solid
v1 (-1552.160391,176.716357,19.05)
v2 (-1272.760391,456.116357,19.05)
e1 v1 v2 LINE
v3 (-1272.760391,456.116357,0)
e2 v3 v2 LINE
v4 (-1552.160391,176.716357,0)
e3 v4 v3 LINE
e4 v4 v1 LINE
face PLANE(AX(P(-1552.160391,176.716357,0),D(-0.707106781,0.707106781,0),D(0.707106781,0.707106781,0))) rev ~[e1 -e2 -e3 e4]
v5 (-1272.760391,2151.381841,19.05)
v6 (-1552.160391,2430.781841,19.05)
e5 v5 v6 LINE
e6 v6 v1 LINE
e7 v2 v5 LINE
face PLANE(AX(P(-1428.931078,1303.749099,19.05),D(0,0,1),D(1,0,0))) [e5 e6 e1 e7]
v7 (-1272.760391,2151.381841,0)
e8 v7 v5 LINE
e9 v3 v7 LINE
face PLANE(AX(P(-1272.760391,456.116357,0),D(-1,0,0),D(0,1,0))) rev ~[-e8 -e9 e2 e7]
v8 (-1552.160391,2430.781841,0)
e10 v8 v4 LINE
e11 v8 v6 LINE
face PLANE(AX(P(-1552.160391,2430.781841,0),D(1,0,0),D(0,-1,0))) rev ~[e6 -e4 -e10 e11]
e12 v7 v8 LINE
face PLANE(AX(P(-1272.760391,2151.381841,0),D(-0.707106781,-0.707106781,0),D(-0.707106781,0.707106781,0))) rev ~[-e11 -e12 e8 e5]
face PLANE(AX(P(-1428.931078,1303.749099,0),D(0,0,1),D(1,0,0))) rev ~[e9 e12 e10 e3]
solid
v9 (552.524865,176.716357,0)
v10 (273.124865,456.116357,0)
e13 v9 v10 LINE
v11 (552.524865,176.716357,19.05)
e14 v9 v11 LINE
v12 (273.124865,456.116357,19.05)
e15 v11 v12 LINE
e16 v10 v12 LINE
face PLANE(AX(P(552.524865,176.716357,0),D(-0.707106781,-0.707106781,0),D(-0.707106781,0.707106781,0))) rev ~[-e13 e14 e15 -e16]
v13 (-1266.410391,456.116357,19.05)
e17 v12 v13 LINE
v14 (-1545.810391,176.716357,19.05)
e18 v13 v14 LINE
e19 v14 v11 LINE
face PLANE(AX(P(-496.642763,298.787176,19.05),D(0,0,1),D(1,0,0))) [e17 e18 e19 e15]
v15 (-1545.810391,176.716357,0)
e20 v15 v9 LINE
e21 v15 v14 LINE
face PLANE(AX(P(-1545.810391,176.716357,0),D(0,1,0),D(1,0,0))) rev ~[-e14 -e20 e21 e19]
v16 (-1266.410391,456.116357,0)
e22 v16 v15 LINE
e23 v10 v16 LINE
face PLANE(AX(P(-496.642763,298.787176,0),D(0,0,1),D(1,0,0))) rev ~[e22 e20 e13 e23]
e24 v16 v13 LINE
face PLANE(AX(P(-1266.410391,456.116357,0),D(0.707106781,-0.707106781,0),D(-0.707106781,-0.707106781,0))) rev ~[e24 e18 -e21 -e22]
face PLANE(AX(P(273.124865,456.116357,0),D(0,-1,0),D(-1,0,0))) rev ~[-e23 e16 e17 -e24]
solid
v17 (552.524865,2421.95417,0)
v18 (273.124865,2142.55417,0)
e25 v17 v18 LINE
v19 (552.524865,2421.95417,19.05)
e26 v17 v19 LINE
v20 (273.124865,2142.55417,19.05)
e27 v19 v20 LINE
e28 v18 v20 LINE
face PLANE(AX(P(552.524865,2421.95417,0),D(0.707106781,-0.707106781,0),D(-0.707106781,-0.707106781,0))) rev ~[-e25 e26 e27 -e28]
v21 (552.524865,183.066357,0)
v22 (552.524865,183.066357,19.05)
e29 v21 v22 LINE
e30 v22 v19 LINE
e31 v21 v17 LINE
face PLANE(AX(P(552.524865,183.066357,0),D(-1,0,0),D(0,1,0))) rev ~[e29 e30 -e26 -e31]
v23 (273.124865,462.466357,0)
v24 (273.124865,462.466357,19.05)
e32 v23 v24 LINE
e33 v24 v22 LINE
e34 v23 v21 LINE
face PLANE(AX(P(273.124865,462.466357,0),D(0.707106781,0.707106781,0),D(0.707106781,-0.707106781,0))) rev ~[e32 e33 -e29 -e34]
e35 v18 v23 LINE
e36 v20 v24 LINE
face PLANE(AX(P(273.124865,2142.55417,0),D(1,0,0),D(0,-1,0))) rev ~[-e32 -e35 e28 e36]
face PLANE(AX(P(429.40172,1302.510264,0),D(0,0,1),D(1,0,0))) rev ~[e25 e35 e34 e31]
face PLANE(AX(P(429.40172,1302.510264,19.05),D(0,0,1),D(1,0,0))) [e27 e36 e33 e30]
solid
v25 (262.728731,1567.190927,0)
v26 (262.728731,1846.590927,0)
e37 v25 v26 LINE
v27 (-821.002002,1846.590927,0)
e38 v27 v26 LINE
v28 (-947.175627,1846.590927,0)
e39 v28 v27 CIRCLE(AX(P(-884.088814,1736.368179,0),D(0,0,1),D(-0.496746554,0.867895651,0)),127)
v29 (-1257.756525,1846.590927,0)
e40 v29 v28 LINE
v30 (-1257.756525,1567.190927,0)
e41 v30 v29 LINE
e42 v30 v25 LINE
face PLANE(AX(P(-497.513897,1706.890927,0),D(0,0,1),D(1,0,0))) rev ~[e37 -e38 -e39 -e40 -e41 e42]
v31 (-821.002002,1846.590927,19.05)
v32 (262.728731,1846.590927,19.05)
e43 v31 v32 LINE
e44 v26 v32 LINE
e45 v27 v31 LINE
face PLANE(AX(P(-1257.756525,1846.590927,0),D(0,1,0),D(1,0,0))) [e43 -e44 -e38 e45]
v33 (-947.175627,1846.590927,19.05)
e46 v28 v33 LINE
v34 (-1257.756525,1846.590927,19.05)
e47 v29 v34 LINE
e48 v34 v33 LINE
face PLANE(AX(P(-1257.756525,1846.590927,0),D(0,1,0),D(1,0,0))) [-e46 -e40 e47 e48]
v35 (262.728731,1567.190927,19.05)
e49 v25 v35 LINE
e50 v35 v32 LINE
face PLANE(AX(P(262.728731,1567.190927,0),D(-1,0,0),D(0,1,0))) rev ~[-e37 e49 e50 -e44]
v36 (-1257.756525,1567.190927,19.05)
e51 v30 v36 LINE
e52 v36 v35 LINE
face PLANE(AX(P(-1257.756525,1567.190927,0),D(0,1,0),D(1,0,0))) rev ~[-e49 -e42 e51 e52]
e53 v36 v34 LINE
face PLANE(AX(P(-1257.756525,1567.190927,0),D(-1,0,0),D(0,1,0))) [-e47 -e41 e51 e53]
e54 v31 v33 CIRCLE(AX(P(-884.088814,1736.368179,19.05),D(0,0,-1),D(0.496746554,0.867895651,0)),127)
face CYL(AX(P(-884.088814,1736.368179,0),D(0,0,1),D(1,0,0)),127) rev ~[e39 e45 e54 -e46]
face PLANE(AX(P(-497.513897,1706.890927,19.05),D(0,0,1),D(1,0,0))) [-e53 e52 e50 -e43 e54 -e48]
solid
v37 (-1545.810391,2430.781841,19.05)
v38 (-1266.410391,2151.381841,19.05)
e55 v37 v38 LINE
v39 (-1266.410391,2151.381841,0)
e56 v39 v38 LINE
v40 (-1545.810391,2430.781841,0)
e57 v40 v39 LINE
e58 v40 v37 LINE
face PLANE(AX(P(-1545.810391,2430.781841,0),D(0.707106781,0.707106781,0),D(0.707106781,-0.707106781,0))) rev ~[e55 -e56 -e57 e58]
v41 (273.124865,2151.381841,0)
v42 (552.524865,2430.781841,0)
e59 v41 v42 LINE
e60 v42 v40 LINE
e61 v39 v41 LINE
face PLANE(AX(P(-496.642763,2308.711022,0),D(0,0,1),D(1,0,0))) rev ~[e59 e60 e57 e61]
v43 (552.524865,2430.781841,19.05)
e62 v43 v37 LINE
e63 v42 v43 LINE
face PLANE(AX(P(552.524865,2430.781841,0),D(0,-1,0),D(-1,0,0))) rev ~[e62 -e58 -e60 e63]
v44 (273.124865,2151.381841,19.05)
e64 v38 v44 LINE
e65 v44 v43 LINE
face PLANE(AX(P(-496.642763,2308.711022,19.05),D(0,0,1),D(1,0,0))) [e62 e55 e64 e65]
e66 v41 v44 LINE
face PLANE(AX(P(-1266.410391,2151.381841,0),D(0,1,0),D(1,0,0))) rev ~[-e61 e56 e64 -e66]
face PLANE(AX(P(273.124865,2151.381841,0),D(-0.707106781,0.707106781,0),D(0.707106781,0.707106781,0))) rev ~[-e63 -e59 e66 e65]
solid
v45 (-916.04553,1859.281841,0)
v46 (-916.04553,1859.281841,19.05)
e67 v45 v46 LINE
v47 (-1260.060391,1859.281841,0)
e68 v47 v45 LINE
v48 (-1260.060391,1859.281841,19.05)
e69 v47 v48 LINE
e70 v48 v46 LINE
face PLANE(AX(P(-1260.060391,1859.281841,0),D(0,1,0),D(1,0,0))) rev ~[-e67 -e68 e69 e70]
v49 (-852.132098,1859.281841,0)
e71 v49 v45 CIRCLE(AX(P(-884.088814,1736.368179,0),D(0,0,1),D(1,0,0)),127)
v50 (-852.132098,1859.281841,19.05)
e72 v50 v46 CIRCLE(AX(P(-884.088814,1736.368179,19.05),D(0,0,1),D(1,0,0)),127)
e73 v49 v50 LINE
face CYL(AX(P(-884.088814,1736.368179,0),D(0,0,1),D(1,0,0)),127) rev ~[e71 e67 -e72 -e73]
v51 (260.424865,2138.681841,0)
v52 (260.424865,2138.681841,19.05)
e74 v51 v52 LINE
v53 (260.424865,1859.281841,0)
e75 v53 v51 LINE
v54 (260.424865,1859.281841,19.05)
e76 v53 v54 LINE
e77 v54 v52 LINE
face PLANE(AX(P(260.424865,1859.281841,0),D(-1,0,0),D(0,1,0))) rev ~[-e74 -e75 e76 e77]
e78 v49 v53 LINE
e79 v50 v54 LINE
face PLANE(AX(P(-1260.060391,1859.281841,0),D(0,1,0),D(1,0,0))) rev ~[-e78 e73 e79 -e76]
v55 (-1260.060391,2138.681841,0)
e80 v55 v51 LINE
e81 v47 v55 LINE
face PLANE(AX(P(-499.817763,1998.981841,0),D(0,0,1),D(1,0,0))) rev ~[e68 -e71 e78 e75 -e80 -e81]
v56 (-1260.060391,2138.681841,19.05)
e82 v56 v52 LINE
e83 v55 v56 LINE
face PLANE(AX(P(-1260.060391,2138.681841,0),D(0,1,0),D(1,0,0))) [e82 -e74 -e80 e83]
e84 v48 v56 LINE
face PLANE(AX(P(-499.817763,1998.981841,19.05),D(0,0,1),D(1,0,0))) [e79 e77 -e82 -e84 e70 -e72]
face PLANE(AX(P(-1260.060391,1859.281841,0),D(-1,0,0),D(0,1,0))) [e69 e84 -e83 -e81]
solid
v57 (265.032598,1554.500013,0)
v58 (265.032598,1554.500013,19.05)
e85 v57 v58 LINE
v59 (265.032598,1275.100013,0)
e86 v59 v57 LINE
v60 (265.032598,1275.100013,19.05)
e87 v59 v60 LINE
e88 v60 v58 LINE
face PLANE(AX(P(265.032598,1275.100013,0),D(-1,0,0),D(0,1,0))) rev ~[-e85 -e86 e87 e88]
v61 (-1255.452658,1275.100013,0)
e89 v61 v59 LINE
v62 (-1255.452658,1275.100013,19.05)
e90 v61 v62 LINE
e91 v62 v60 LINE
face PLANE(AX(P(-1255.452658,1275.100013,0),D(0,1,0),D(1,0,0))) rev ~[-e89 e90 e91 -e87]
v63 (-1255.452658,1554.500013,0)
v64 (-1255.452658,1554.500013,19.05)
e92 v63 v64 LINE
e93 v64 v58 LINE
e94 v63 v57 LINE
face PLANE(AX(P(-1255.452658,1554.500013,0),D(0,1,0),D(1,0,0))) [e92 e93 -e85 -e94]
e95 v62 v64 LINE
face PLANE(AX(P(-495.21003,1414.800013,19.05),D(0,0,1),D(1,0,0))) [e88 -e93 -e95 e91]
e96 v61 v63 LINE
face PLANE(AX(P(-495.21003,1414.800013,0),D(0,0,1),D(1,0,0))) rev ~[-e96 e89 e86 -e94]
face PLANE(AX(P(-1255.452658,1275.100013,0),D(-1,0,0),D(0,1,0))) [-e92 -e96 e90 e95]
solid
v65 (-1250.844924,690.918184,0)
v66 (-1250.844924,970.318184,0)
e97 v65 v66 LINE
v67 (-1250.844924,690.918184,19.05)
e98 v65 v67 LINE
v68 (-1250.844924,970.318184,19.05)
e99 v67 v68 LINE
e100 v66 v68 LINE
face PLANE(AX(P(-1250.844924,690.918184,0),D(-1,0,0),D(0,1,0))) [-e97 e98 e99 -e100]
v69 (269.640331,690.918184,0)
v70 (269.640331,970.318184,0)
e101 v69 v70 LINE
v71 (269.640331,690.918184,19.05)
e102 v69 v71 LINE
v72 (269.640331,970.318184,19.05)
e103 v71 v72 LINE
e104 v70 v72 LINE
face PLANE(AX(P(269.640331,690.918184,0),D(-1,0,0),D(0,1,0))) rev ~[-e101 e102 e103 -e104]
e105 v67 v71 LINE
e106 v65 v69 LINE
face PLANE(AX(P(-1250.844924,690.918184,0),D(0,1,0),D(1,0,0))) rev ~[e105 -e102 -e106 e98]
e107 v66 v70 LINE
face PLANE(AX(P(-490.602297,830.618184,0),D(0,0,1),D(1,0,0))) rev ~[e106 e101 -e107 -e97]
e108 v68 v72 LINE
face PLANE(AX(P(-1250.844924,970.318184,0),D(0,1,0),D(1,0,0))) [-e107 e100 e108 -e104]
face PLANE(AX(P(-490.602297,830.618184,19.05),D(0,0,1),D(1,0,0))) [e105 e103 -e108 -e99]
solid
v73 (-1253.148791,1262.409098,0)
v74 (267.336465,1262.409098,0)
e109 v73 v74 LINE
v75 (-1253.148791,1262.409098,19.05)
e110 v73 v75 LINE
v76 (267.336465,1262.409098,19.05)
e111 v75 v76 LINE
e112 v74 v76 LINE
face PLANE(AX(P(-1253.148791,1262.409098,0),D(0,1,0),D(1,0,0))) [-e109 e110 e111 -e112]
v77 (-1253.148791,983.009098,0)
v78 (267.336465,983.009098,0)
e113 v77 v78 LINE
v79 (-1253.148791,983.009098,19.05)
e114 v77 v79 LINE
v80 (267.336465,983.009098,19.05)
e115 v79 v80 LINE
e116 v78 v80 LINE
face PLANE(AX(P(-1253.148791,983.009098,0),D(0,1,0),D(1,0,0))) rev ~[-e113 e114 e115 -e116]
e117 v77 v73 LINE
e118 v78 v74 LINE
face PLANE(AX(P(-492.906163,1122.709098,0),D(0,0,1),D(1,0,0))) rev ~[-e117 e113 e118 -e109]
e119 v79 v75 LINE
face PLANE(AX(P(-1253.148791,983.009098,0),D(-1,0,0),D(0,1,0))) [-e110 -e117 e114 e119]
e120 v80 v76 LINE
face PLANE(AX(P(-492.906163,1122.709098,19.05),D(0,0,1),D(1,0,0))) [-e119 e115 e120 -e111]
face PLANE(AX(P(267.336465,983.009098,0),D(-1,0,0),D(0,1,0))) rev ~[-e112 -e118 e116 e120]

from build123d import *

# Parameters (mm, degrees)
F1_DEPTH      = 19.05
F0_W          = 1520.485255909
F0_H          = 279.4
F2_R          = 127
F3_DEPTH      = 19.051
F3_DEPTH_BACK = 4532


# Not quite as in the source:
# - an extrude ends at something that could not be found from the text; its depth is read off the source's solid


with BuildPart() as f1:
    # F0 (on Top) → F1 (new body)
    with BuildSketch(Plane.XY):
        Polygon((-1552.1603912354, 2430.7818412781), (-1552.1603912354, 176.7163574696), (-1272.7603912354, 456.1163574696), (-1272.7603912354, 2151.3818412781), align=None)
    extrude(amount=F1_DEPTH)


with BuildPart() as f1b:
    # F0 (on Top) → F1, piece 2 (new body)
    with BuildSketch(Plane.XY):
        Polygon((-1545.8103912354, 176.7163574696), (552.5248646736, 176.7163574696), (273.1248646736, 456.1163574696), (-1266.4103912354, 456.1163574696), align=None)
    extrude(amount=F1_DEPTH)


with BuildPart() as f1c:
    # F0 (on Top) → F1, piece 3 (new body)
    with BuildSketch(Plane.XY):
        Polygon((552.5248646736, 2430.7818412781), (-1545.8103912354, 2430.7818412781), (-1266.4103912354, 2151.3818412781), (273.1248646736, 2151.3818412781), align=None)
    extrude(amount=F1_DEPTH)


with BuildPart() as f1d:
    # F0 (on Top) → F1, piece 4 (new body)
    with BuildSketch(Plane.XY):
        Polygon((552.5248646736, 183.0663574696), (552.5248646736, 2421.9541702463), (273.1248646736, 2142.5541702463), (273.1248646736, 462.4663574696), align=None)
    extrude(amount=F1_DEPTH)


with BuildPart() as f1e:
    # F0 (on Top) → F1, piece 5 (new body)
    with BuildSketch(Plane.XY):
        with Locations((-499.8177632809, 1998.9818412781)):
            Rectangle(F0_W, F0_H)
    extrude(amount=F1_DEPTH)


with BuildPart() as f1f:
    # F0 (on Top) → F1, piece 6 (new body)
    with BuildSketch(Plane.XY):
        with Locations((-497.513896589, 1706.8909270095)):
            Rectangle(F0_W, F0_H)
    extrude(amount=F1_DEPTH)


with BuildPart() as f1g:
    # F0 (on Top) → F1, piece 7 (new body)
    with BuildSketch(Plane.XY):
        with Locations((-495.2100298971, 1414.8000127409)):
            Rectangle(F0_W, F0_H)
    extrude(amount=F1_DEPTH)


with BuildPart() as f1h:
    # F0 (on Top) → F1, piece 8 (new body)
    with BuildSketch(Plane.XY):
        with Locations((-492.9061632052, 1122.7090984723)):
            Rectangle(F0_W, F0_H)
    extrude(amount=F1_DEPTH)


with BuildPart() as f1i:
    # F0 (on Top) → F1, piece 9 (new body)
    with BuildSketch(Plane.XY):
        with Locations((-490.6022965133, 830.6181842037)):
            Rectangle(F0_W, F0_H)
    extrude(amount=F1_DEPTH)


with BuildPart() as f3_tool:
    # F2 (on Top) → F3 (new body, two sides)
    with BuildSketch(Plane.XY) as f3_sk:
        with Locations((-884.0888142586, 1736.3681793213)):
            Circle(F2_R)
    extrude(amount=F3_DEPTH)
    extrude(f3_sk.sketch, amount=-F3_DEPTH_BACK)


with BuildPart() as f1e_1:
    add(f1e.part)

    # F3: cut by f3_tool
    add(f3_tool.part, mode=Mode.SUBTRACT)


with BuildPart() as f1f_1:
    add(f1f.part)

    # F3: cut by f3_tool
    add(f3_tool.part, mode=Mode.SUBTRACT)


solid = Compound([f1.part, f1b.part, f1c.part, f1d.part, f1g.part, f1h.part, f1i.part, f1e_1.part, f1f_1.part])
